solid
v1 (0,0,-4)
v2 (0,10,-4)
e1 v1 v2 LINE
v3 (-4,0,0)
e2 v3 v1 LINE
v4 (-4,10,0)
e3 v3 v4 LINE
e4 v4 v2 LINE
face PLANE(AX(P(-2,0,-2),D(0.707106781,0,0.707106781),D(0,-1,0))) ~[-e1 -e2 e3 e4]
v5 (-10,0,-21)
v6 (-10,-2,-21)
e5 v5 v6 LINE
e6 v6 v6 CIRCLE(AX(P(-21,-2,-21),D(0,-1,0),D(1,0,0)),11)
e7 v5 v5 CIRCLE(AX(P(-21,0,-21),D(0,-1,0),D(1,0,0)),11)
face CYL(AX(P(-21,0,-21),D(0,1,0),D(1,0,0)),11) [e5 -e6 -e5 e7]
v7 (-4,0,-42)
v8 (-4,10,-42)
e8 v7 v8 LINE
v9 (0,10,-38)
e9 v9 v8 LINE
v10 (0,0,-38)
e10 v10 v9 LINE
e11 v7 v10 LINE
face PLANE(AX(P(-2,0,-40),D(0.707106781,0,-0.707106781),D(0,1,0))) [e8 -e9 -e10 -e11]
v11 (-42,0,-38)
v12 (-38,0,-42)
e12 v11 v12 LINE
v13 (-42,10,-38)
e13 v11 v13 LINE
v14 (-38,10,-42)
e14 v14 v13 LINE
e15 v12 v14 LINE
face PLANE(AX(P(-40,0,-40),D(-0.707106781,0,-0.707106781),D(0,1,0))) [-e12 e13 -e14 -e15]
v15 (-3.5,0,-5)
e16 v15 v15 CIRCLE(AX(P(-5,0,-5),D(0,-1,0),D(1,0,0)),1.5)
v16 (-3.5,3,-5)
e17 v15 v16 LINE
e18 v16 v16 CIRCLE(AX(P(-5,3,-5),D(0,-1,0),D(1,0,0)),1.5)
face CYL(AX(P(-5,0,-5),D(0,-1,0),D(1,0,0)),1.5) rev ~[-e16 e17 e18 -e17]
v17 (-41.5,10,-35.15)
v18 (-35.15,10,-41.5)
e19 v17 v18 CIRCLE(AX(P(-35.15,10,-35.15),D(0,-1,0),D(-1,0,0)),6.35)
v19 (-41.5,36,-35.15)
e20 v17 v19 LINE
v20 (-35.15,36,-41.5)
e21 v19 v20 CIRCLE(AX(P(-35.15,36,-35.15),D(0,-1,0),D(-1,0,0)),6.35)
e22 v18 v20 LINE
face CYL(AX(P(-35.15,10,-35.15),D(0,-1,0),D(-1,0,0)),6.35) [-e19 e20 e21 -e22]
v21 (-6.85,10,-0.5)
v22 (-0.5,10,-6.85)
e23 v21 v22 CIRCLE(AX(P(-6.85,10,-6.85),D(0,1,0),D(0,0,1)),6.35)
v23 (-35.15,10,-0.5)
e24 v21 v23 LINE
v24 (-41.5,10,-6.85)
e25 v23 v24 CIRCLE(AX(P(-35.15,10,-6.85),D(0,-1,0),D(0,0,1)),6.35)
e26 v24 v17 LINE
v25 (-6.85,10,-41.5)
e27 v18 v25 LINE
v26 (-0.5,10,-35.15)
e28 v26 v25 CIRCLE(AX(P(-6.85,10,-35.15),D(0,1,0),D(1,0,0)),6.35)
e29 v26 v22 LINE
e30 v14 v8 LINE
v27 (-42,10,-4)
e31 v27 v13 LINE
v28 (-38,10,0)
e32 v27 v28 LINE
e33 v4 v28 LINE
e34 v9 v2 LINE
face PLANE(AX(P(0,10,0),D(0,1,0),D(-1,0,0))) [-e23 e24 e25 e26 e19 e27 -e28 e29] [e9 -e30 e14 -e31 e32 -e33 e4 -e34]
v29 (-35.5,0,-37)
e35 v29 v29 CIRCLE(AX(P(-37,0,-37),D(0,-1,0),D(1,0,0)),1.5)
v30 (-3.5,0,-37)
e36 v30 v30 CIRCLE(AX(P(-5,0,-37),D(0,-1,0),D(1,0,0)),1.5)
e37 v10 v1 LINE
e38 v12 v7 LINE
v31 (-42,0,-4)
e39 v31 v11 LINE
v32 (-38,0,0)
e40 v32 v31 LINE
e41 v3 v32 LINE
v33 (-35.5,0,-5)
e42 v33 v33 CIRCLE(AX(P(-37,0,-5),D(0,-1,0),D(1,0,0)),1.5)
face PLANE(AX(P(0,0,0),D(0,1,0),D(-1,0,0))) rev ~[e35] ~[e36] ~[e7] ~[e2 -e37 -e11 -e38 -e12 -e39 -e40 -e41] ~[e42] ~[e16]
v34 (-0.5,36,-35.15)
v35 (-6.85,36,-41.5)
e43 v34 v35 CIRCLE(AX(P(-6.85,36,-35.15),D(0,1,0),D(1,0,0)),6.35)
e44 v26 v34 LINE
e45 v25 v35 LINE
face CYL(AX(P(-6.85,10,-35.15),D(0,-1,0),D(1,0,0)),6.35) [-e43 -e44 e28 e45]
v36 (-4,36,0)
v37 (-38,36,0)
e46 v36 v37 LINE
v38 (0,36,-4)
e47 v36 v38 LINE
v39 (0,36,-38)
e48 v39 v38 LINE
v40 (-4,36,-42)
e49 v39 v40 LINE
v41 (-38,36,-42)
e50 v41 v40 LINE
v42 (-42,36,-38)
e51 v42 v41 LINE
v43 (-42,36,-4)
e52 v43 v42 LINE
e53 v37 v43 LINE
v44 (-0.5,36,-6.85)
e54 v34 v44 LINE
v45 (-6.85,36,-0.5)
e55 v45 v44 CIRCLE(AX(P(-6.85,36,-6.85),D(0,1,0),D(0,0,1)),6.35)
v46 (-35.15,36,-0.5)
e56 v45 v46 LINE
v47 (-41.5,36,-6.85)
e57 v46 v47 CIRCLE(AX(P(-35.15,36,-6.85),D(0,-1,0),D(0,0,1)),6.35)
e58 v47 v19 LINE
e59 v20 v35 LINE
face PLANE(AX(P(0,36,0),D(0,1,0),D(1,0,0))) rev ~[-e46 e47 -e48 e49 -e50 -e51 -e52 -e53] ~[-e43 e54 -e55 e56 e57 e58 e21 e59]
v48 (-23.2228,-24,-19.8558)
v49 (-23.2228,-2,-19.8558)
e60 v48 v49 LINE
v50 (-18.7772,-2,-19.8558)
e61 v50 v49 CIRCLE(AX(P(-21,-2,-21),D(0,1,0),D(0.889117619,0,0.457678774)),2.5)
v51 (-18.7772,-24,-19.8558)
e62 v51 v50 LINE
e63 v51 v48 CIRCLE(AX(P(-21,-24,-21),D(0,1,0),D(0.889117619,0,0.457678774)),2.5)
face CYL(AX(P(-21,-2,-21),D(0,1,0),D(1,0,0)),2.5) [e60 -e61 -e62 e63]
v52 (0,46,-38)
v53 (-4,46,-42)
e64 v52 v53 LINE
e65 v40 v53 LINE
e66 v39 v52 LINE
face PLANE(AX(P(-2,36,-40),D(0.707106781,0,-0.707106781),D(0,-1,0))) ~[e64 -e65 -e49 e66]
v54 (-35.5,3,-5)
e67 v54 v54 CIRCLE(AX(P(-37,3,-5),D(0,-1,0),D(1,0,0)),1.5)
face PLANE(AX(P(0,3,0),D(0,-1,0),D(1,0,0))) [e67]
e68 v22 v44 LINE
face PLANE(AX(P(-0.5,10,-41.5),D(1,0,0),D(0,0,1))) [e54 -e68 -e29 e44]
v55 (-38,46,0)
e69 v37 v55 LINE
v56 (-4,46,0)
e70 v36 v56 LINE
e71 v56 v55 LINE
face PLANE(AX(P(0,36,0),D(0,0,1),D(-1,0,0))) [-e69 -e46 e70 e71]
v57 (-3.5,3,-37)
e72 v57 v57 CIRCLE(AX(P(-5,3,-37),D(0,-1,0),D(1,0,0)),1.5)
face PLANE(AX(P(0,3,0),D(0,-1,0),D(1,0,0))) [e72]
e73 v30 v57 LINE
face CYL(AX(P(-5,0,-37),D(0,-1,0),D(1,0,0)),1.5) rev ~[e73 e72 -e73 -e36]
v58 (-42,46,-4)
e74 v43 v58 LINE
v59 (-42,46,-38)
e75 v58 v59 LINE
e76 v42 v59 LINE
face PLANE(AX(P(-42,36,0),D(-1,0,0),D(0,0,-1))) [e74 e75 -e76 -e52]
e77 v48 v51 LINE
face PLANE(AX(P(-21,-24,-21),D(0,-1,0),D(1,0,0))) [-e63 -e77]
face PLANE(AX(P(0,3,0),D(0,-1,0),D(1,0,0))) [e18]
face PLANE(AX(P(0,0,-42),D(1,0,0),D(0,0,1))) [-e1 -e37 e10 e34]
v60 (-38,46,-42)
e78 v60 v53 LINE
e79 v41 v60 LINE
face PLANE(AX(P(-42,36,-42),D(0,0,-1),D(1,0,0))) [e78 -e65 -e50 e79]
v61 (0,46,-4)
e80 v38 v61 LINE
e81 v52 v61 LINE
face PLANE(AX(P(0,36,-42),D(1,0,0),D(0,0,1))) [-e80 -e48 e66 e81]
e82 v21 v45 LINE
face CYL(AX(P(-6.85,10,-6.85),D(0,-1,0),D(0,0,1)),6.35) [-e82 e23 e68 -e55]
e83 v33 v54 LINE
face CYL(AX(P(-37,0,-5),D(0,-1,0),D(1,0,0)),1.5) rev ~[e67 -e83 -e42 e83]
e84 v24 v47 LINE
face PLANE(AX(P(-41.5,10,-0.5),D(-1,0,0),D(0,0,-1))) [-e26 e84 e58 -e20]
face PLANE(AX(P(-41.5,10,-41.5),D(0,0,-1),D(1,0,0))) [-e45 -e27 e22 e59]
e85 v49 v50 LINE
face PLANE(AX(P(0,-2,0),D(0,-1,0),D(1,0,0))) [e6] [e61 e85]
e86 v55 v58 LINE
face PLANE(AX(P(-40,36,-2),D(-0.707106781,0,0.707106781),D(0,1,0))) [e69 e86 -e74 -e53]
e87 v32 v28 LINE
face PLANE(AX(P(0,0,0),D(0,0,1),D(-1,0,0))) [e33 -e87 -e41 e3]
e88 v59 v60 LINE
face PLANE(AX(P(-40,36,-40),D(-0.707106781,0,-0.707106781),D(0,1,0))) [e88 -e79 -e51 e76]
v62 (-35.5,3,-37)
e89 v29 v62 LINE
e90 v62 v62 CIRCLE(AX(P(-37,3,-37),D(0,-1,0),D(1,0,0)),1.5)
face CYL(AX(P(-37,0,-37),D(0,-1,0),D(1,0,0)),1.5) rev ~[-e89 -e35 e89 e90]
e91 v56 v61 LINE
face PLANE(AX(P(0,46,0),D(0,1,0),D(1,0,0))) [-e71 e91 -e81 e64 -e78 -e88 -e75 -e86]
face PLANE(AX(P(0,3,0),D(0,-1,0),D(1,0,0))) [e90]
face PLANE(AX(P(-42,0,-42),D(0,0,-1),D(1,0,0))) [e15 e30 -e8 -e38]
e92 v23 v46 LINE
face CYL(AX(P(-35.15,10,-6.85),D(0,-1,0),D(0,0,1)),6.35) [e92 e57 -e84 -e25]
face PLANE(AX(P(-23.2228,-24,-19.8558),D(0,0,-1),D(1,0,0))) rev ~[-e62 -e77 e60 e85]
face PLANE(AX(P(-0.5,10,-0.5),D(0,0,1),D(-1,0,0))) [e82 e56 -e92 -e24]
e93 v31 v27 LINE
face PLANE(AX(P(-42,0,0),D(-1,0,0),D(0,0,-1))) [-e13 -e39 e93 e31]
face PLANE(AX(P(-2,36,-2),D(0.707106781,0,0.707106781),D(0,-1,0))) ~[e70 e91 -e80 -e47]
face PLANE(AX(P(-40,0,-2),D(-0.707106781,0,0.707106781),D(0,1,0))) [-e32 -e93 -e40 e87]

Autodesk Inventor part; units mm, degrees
ref_plane "YZ Plane" through (0, 0, 0) normal (1, 0, 0) x (0, 1, 0)
ref_plane "XZ Plane" through (0, 0, 0) normal (0, 1, 0) x (-1, 0, 0)
ref_plane "XY Plane" through (0, 0, 0) normal (0, 0, 1) x (1, 0, 0)
sketch "Sketch1" plane through (0, 0, 0) normal (0, 1, 0) x (-1, 0, 0)
  line L0 (0, 0) -> (42, 0)
  line L1 (42, 0) -> (42, -42)
  line L2 (42, -42) -> (0, -42)
  line L3 (0, -42) -> (0, 0)
  dimension "d0" = 42
  dimension "d1" = 42
extrude "Extrusion1" add sketch "Sketch1" along normal blind 10
chamfer "Chamfer1" distance 4 angle 45 4 edges at (0, 5, 0) (0, 5, -42) (-42, 5, -42) (-42, 5, 0)
sketch "Sketch2" plane through (0, 10, 0) normal (0, 1, 0) x (1, 0, 0)
  point P0 (0, 0)
sketch "Sketch3" plane through (0, 10, 0) normal (0, 1, 0) x (1, 0, 0)
  line L0 (-0.5, 0.5) -> (-41.5, 0.5)
  line L1 (-41.5, 0.5) -> (-41.5, 41.5)
  line L2 (-41.5, 41.5) -> (-0.5, 41.5)
  line L3 (-0.5, 41.5) -> (-0.5, 0.5)
  line L4 (-0.5, 0.5) -> (-41.5, 41.5) construction
  line L5 (-41.5, 0.5) -> (-0.5, 41.5) construction
  point P0 (0, 0)
  point P1 (-21, 21)
  dimension "d7" = 41
  dimension "d8" = 41
extrude "Extrusion2" add sketch "Sketch3" along normal blind 26
fillet "Fillet1" radius 6.35 4 edges at (-41.5, 23, -41.5) (-0.5, 23, -41.5) (-41.5, 23, -0.5) (-0.5, 23, -0.5)
sketch "Sketch4" plane through (0, 36, 0) normal (0, 1, 0) x (1, 0, 0)
  line L0 (0, 0) -> (-42, 0)
  line L1 (-42, 0) -> (-42, 42)
  line L2 (-42, 42) -> (0, 42)
  line L3 (0, 42) -> (0, 0)
  dimension "d12" = 42
  dimension "d13" = 42
extrude "Extrusion3" add sketch "Sketch4" along normal blind 10
chamfer "Chamfer2" distance 4 angle 45 4 edges at (-42, 41, -42) (-42, 41, 0) (0, 41, -42) (0, 41, 0)
sketch "Sketch5" plane through (0, 0, 0) normal (0, -1, 0) x (1, 0, 0)
  circle A0 centre (-21, -21) radius 11
  point P0 (0, 0)
  dimension "d19" = 22
extrude "Extrusion4" add sketch "Sketch5" along normal blind 2
sketch "Sketch6" plane through (-21, -2, -21) normal (0, -1, 0) x (1, 0, 0)
  circle A0 centre (0, 0) radius 2.5
  point P0 (21, 21)
  dimension "d22" = 5
extrude "Extrusion5" add sketch "Sketch6" along normal blind 22
sketch "Sketch7" plane through (0, 0, 0) normal (0, -1, 0) x (1, 0, 0)
  circle A0 centre (-37, -5) radius 1.5
  circle A1 centre (-5, -5) radius 1.5
  circle A2 centre (-5, -37) radius 1.5
  circle A3 centre (-37, -37) radius 1.5
  point P0 (0, 0)
  dimension "d25" = 3
  dimension "d26" = 3
  dimension "d27" = 3
  dimension "d28" = 3
extrude "Extrusion6" cut sketch "Sketch7" against normal blind 3
sketch "Sketch8" plane through (-21, -24, -21) normal (0, -1, 0) x (1, 0, 0)
  circle A0 centre (0, 0) radius 2.5 projected
  arc A1 (-2.2228, 1.1442) -> (2.2228, 1.1442) centre (0, 0) ccw
  line L0 (-2.2228, 1.1442) -> (2.2228, 1.1442)
  point P0 (21, 21)
extrude "Extrusion7" cut sketch "Sketch8" against normal blind 22 contours L0 A0 picked at (0.2976, 1.8759)
properties part number "nema17_84Ncm"
